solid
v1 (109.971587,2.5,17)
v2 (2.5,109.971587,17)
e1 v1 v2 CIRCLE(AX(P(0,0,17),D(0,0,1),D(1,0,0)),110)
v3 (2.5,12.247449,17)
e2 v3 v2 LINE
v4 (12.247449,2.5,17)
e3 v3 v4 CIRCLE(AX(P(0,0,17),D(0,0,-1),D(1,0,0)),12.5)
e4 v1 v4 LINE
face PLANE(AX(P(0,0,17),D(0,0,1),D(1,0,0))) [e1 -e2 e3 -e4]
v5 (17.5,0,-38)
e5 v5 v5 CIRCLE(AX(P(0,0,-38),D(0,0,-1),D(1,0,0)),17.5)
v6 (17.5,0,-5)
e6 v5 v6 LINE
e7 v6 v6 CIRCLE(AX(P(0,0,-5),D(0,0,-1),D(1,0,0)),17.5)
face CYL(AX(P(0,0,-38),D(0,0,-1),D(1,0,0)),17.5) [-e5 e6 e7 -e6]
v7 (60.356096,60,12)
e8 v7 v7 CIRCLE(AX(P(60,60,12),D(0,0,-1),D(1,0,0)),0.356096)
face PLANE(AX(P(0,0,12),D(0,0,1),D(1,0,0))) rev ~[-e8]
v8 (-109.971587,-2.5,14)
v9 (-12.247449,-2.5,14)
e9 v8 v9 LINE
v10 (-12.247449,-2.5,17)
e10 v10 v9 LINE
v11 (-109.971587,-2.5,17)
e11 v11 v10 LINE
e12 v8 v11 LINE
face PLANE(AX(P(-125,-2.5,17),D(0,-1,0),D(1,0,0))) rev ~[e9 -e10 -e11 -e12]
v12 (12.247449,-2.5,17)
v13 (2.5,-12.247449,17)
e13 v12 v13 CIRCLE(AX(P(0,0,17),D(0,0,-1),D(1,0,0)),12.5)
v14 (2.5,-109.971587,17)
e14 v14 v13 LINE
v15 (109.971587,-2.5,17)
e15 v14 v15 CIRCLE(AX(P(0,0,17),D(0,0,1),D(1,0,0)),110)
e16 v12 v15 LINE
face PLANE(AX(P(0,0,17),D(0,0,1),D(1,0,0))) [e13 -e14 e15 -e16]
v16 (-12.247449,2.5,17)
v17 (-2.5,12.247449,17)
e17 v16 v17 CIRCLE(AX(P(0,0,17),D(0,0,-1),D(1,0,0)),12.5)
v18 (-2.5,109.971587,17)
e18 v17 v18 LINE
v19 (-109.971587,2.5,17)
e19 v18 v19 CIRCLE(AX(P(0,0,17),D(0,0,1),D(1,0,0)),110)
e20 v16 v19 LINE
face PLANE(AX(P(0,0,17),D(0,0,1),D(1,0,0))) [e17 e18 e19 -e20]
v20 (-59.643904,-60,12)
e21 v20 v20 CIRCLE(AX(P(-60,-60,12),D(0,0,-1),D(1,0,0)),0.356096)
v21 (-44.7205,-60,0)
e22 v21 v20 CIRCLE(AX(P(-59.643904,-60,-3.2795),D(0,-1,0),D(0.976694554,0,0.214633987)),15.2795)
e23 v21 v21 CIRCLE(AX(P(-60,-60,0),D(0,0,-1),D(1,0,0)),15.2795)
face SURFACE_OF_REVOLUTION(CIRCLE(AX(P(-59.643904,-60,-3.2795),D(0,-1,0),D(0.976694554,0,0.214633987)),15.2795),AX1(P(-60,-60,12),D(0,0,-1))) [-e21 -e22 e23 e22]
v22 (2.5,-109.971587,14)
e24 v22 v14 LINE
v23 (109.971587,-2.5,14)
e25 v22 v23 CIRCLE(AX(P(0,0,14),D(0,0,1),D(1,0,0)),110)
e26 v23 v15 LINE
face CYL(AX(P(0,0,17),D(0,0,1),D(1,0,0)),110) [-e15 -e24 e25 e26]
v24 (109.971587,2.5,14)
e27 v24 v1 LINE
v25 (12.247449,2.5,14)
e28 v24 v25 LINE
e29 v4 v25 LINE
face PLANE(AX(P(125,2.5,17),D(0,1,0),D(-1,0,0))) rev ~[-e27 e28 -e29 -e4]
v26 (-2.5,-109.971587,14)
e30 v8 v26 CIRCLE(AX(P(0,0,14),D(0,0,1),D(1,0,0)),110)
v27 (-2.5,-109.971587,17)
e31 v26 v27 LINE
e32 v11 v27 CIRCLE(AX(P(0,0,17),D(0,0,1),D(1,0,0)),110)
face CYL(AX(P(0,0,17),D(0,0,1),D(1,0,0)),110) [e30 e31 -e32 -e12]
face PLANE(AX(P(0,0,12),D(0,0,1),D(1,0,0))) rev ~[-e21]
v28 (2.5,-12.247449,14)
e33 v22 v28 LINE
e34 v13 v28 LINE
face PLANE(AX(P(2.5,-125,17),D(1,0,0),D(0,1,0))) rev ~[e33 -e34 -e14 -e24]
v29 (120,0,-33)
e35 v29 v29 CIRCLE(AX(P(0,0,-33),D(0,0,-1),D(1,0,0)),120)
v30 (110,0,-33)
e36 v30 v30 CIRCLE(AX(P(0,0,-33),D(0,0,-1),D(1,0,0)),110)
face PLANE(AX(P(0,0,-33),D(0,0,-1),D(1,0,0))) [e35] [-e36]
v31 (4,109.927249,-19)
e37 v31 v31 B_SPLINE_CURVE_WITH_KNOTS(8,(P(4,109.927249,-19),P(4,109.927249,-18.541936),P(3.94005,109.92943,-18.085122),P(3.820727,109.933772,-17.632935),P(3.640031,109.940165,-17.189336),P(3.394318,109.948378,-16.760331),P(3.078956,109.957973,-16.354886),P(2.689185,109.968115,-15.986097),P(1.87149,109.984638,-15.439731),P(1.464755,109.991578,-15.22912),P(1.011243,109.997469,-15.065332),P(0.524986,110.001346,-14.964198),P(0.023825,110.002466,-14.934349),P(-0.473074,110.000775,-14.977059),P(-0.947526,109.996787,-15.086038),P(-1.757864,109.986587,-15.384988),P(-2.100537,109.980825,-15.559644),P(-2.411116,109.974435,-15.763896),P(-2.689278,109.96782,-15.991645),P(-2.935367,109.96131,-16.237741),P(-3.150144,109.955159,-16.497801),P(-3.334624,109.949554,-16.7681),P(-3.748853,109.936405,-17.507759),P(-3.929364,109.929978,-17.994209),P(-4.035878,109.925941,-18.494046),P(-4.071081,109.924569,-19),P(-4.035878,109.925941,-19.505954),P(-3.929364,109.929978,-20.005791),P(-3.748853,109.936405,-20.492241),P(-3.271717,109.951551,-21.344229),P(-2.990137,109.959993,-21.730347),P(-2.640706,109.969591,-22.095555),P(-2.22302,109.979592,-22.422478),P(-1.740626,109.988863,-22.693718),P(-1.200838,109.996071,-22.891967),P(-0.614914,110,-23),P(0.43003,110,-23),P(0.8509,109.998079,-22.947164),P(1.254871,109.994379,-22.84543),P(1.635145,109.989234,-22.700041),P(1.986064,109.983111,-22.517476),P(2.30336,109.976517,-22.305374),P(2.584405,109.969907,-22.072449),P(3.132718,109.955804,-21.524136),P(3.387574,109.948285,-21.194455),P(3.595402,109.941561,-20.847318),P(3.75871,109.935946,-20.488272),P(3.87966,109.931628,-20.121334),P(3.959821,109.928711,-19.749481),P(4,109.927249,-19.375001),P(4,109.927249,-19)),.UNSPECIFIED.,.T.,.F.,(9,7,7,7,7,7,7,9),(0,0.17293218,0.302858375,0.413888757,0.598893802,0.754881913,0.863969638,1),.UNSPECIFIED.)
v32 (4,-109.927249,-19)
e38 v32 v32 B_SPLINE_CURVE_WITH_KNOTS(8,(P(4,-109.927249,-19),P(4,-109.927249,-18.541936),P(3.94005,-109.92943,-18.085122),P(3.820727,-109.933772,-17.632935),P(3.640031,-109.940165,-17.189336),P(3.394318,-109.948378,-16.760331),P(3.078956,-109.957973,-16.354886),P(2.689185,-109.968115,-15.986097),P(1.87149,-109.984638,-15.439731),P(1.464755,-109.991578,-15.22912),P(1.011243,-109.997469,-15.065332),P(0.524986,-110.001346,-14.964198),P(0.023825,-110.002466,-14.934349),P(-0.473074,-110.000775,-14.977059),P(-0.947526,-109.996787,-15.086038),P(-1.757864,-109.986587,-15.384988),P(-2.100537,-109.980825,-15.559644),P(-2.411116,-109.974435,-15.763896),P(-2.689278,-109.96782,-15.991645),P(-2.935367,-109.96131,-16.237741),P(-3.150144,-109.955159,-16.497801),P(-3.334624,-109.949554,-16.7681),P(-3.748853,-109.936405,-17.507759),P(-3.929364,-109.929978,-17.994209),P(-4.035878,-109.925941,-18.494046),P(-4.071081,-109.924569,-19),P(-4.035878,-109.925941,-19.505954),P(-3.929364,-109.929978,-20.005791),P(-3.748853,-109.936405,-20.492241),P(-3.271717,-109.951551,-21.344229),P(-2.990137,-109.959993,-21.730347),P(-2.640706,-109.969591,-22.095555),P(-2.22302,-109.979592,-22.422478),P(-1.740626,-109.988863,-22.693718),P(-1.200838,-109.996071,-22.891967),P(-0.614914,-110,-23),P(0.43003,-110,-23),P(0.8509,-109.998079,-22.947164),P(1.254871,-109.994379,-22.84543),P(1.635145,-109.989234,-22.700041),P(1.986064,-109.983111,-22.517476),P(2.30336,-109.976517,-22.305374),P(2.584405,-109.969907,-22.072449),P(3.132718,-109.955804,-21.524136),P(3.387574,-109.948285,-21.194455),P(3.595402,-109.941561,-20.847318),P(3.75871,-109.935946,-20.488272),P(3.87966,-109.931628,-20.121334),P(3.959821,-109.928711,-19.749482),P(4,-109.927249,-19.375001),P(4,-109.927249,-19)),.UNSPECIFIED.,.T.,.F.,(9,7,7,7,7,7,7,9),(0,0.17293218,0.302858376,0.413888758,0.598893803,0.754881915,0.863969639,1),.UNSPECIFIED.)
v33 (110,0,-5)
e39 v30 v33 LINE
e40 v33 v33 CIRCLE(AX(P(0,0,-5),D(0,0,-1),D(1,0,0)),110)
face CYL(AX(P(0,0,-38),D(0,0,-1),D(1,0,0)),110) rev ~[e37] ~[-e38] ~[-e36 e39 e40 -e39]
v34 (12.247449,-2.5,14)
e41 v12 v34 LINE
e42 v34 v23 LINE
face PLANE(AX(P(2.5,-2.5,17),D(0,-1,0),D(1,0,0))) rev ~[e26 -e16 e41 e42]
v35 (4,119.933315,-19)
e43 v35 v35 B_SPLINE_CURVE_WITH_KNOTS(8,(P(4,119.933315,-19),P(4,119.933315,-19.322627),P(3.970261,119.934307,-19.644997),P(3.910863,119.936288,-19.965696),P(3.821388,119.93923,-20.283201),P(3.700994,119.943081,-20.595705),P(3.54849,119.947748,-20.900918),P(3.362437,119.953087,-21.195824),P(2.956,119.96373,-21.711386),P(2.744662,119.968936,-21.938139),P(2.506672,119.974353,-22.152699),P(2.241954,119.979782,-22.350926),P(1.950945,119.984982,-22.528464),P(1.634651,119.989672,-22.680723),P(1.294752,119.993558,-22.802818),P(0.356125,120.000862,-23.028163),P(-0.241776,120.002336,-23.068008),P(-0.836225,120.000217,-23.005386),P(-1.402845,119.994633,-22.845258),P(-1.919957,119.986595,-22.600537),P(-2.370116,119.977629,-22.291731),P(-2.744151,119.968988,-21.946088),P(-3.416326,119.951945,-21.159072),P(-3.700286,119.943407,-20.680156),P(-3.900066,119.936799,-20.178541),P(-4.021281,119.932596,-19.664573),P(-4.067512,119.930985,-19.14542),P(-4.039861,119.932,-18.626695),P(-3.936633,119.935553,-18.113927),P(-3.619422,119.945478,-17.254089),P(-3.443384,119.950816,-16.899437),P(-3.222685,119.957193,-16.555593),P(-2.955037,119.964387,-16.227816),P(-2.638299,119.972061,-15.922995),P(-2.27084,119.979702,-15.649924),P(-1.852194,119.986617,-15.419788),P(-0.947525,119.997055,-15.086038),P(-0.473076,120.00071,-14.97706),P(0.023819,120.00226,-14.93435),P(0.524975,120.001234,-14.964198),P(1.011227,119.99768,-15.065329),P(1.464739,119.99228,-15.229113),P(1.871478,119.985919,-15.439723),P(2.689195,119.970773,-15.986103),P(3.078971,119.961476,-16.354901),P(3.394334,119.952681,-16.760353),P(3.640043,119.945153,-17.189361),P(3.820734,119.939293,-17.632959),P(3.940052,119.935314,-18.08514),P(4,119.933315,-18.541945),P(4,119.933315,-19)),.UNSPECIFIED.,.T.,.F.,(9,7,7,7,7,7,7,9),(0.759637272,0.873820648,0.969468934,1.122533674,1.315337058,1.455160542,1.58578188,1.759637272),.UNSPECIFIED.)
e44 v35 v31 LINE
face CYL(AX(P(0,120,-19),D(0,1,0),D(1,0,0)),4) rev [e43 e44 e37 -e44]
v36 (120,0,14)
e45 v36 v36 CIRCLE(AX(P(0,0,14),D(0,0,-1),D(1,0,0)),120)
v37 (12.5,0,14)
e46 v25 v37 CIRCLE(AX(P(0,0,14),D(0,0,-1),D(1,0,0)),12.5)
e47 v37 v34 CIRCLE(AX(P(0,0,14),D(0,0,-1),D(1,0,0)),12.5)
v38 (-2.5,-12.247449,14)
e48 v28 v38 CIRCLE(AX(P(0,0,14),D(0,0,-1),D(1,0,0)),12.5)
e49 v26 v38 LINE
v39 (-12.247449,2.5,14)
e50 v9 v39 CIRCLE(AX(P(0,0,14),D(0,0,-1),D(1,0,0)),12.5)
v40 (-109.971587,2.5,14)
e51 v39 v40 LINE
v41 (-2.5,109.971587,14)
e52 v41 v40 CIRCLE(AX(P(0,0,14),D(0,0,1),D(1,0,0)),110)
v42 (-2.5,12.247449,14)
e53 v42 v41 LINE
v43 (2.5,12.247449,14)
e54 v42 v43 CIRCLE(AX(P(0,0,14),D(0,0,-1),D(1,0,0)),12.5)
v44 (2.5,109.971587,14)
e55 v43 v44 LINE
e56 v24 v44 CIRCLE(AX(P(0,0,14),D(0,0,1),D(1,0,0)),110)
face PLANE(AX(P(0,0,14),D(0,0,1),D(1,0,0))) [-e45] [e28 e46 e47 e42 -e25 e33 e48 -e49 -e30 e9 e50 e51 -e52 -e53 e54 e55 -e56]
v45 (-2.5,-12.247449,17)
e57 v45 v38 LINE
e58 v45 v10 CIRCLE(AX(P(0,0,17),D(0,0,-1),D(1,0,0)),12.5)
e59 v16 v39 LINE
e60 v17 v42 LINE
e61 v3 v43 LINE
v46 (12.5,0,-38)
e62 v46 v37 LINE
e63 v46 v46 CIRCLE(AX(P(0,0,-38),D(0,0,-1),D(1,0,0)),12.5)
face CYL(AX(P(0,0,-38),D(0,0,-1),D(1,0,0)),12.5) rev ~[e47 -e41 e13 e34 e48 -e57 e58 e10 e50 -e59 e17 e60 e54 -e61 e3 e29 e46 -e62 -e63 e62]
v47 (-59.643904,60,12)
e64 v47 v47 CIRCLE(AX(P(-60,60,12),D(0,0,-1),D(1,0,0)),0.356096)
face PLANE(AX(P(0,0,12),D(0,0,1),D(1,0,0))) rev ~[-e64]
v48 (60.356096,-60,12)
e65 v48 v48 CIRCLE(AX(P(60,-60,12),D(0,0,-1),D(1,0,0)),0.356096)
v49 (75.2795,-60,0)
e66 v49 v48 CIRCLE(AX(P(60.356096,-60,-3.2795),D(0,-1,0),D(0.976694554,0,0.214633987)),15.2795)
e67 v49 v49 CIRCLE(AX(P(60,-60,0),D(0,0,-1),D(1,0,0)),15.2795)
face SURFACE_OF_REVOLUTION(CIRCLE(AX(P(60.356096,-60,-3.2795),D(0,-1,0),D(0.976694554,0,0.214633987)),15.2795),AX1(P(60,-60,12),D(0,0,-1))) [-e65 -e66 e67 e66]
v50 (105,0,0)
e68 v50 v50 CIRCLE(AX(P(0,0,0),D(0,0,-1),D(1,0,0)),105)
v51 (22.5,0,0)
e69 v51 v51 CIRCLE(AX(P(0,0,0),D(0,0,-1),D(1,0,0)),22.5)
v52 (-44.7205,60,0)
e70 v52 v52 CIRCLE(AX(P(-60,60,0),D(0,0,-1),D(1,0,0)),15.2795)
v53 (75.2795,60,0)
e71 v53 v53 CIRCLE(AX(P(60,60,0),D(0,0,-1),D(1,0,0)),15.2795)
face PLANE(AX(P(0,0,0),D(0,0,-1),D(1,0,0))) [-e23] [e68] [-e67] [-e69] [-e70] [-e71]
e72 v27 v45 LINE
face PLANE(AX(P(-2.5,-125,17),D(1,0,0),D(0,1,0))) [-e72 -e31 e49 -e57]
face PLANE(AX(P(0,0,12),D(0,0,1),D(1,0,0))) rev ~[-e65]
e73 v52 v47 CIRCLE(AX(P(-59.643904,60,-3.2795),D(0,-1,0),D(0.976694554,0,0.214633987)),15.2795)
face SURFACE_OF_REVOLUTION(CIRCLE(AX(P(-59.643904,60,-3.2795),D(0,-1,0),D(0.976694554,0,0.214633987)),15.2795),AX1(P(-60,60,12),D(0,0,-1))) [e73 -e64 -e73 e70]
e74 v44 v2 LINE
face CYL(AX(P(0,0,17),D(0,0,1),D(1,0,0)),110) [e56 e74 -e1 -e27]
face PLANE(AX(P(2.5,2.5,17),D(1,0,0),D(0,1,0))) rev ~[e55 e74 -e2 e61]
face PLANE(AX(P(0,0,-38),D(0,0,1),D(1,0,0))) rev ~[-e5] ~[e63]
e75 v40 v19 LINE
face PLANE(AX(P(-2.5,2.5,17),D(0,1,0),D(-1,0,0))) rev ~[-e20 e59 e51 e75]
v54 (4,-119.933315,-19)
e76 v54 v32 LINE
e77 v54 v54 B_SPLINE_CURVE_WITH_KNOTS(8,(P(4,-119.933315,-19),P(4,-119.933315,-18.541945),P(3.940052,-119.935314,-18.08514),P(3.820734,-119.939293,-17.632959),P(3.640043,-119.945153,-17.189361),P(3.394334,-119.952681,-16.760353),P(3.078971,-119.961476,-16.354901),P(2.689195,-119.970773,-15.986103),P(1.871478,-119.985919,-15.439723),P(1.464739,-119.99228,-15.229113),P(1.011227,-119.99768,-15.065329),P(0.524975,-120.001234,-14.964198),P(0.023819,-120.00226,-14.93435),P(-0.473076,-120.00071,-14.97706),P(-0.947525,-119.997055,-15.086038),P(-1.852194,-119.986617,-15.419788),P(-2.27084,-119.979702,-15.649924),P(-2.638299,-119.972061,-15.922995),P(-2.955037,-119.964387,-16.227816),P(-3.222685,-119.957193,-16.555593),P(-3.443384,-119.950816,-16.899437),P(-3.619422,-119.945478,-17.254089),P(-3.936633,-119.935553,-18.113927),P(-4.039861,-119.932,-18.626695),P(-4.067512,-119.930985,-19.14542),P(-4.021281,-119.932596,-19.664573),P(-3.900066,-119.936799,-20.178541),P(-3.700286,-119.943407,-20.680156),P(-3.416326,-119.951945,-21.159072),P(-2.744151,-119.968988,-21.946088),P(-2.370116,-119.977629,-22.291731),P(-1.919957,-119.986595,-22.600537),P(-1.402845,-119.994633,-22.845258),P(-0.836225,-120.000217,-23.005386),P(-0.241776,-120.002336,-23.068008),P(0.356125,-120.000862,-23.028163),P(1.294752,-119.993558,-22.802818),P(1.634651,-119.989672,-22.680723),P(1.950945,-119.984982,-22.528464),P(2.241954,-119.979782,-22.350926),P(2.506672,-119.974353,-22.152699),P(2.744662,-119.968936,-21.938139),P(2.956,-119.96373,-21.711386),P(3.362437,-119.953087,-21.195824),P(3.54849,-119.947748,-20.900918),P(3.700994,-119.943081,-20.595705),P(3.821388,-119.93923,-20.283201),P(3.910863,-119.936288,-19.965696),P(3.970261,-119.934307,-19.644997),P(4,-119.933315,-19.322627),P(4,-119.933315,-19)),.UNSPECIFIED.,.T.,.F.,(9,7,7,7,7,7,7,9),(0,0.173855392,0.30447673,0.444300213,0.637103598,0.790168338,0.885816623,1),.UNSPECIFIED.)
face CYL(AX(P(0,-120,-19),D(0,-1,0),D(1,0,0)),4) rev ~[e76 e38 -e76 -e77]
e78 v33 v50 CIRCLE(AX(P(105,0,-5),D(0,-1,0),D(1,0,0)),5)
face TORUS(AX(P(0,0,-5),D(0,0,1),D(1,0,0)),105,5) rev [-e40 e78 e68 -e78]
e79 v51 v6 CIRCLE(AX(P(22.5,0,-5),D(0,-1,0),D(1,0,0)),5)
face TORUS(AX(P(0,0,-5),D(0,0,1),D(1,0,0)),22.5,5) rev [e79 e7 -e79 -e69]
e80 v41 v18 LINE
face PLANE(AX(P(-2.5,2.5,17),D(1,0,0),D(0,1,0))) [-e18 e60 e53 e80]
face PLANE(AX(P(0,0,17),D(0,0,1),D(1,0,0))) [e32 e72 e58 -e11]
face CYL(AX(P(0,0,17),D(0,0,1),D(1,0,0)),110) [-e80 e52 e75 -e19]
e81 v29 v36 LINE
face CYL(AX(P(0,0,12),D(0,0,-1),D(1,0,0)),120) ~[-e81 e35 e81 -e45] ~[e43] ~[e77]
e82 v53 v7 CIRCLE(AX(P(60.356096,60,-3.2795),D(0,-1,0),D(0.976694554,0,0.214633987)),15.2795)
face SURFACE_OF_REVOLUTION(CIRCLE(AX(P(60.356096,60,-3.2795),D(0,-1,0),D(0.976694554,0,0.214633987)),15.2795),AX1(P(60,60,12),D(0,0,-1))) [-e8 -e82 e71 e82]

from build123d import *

# Parameters (mm, degrees)
F0_R          = 120
F1_DEPTH      = 12
F1_DEPTH_BACK = 38
F2_R          = 110
F2_R_2        = 17.5
F3_DEPTH      = 38
F4_R          = 5
F5_R          = 15.2795
F6_DEPTH      = 15.2795
F8_R          = 120
F9_DEPTH      = 5
F10_R         = 12.5
F11_DEPTH     = 55.001
F12_R         = 120
F12_R_2       = 110
F13_DEPTH     = 3
F14_W         = 5
F14_H         = 122.5
F14_W_2       = 122.5
F14_H_2       = 5
F15_DEPTH     = 3
F16_R         = 136.7884680592
F16_R_2       = 100.9393969777
F17_DEPTH     = 5
F19_R         = 4
F20_DEPTH     = 25
F22_R         = 4
F23_DEPTH     = 25


# Not quite as in the source:
# - a fillet or chamfer that OpenCascade refuses, or shapes differently, is made with other operations: its cross-section is extruded or revolved along the edge and cut away or added


with BuildPart() as f1:
    # F0 (on Top) → F1 (new body, two sides)
    with BuildSketch(Plane.XY) as f1_sk:
        Circle(F0_R)
    extrude(amount=F1_DEPTH)
    extrude(f1_sk.sketch, amount=-F1_DEPTH_BACK)

    # F2 (on face) → F3 (cut)
    with BuildSketch(Plane(origin=(0, 0, -38), x_dir=(1, 0, 0), z_dir=(0, 0, -1))):
        Circle(F2_R)
        Circle(F2_R_2, mode=Mode.SUBTRACT)
    extrude(amount=-F3_DEPTH, mode=Mode.SUBTRACT)

    # F4
    f4_edges = [f1.edges().sort_by_distance(p)[0] for p in [
        (-17.5, 0, 0),
        (-110, 0, 0),
    ]]
    fillet(f4_edges, radius=F4_R)

    # F5 (on face) → F6 (cut)
    with BuildSketch(Plane(origin=(0, 0, 0), x_dir=(1, 0, 0), z_dir=(0, 0, -1))):
        with Locations((-60, 60)):
            Circle(F5_R)
        with Locations((-60, -60)):
            Circle(F5_R)
        with Locations((60, -60)):
            Circle(F5_R)
        with Locations((60, 60)):
            Circle(F5_R)
    extrude(amount=-F6_DEPTH, mode=Mode.SUBTRACT)

    # F8 (on face) → F9 (join)
    with BuildSketch(Plane.XY.offset(12)):
        Circle(F8_R)
    extrude(amount=F9_DEPTH)

    # F10 (on face) → F11 (cut, through all)
    with BuildSketch(Plane(origin=(0, 0, -38), x_dir=(1, 0, 0), z_dir=(0, 0, -1))):
        Circle(F10_R)
    extrude(amount=-F11_DEPTH, mode=Mode.SUBTRACT)

    # F12 (on face) → F13 (cut)
    with BuildSketch(Plane.XY.offset(17)):
        Circle(F12_R)
        Circle(F12_R_2, mode=Mode.SUBTRACT)
    extrude(amount=-F13_DEPTH, mode=Mode.SUBTRACT)

    # F14 (on face) → F15 (cut)
    with BuildSketch(Plane.XY.offset(17)):
        with Locations((0, -63.75)):
            Rectangle(F14_W, F14_H)
        with Locations((-63.75, 0)):
            Rectangle(F14_W_2, F14_H_2)
        Rectangle(F14_W, F14_H_2)
        with Locations((63.75, 0)):
            Rectangle(F14_W_2, F14_H_2)
        with Locations((0, 63.75)):
            Rectangle(F14_W, F14_H)
    extrude(amount=-F15_DEPTH, mode=Mode.SUBTRACT)

    # F16 (on face) → F17 (cut)
    with BuildSketch(Plane(origin=(0, 0, -38), x_dir=(1, 0, 0), z_dir=(0, 0, -1))):
        Circle(F16_R)
        Circle(F16_R_2, mode=Mode.SUBTRACT)
    extrude(amount=-F17_DEPTH, mode=Mode.SUBTRACT)

    # F18: fillet of radius 15.2795 on 4 edges, made by hand

    # F18_s1 → F18_t2 (revolve)
    with BuildSketch(Plane.XZ.offset(60)):
        with BuildLine():
            ThreePointArc((75.2795, 0), (69.9309062658, 8.6278977111), (60.3560955627, 12))
            Line((60.3560955627, 12), (75.2795, 12))
            Line((75.2795, 12), (75.2795, 0))
        make_face()
    revolve(axis=Axis((60, -60, 12), (0, 0, -1)))

    # F18_s3 → F18_t4 (revolve)
    with BuildSketch(Plane.XZ.offset(60)):
        with BuildLine():
            ThreePointArc((-44.7205, 0), (-50.0690937342, 8.6278977111), (-59.6439044373, 12))
            Line((-59.6439044373, 12), (-44.7205, 12))
            Line((-44.7205, 12), (-44.7205, 0))
        make_face()
    revolve(axis=Axis((-60, -60, 12), (0, 0, -1)))

    # F18_s5 → F18_t6 (revolve)
    with BuildSketch(Plane.XZ.offset(-60)):
        with BuildLine():
            ThreePointArc((-44.7205, 0), (-50.0690937342, 8.6278977111), (-59.6439044373, 12))
            Line((-59.6439044373, 12), (-44.7205, 12))
            Line((-44.7205, 12), (-44.7205, 0))
        make_face()
    revolve(axis=Axis((-60, 60, 12), (0, 0, -1)))

    # F18_s7 → F18_t8 (revolve)
    with BuildSketch(Plane.XZ.offset(-60)):
        with BuildLine():
            ThreePointArc((75.2795, 0), (69.9309062658, 8.6278977111), (60.3560955627, 12))
            Line((60.3560955627, 12), (75.2795, 12))
            Line((75.2795, 12), (75.2795, 0))
        make_face()
    revolve(axis=Axis((60, 60, 12), (0, 0, -1)))

    # F19 (on offset) → F20 (cut)
    with BuildSketch(Plane.XZ.offset(120)):
        with Locations((0, -19)):
            Circle(F19_R)
    extrude(amount=-F20_DEPTH, mode=Mode.SUBTRACT)

    # F22 (on offset) → F23 (cut)
    with BuildSketch(Plane.XZ.offset(-120)):
        with Locations((0, -19)):
            Circle(F22_R)
    extrude(amount=F23_DEPTH, mode=Mode.SUBTRACT)


solid = f1.part
